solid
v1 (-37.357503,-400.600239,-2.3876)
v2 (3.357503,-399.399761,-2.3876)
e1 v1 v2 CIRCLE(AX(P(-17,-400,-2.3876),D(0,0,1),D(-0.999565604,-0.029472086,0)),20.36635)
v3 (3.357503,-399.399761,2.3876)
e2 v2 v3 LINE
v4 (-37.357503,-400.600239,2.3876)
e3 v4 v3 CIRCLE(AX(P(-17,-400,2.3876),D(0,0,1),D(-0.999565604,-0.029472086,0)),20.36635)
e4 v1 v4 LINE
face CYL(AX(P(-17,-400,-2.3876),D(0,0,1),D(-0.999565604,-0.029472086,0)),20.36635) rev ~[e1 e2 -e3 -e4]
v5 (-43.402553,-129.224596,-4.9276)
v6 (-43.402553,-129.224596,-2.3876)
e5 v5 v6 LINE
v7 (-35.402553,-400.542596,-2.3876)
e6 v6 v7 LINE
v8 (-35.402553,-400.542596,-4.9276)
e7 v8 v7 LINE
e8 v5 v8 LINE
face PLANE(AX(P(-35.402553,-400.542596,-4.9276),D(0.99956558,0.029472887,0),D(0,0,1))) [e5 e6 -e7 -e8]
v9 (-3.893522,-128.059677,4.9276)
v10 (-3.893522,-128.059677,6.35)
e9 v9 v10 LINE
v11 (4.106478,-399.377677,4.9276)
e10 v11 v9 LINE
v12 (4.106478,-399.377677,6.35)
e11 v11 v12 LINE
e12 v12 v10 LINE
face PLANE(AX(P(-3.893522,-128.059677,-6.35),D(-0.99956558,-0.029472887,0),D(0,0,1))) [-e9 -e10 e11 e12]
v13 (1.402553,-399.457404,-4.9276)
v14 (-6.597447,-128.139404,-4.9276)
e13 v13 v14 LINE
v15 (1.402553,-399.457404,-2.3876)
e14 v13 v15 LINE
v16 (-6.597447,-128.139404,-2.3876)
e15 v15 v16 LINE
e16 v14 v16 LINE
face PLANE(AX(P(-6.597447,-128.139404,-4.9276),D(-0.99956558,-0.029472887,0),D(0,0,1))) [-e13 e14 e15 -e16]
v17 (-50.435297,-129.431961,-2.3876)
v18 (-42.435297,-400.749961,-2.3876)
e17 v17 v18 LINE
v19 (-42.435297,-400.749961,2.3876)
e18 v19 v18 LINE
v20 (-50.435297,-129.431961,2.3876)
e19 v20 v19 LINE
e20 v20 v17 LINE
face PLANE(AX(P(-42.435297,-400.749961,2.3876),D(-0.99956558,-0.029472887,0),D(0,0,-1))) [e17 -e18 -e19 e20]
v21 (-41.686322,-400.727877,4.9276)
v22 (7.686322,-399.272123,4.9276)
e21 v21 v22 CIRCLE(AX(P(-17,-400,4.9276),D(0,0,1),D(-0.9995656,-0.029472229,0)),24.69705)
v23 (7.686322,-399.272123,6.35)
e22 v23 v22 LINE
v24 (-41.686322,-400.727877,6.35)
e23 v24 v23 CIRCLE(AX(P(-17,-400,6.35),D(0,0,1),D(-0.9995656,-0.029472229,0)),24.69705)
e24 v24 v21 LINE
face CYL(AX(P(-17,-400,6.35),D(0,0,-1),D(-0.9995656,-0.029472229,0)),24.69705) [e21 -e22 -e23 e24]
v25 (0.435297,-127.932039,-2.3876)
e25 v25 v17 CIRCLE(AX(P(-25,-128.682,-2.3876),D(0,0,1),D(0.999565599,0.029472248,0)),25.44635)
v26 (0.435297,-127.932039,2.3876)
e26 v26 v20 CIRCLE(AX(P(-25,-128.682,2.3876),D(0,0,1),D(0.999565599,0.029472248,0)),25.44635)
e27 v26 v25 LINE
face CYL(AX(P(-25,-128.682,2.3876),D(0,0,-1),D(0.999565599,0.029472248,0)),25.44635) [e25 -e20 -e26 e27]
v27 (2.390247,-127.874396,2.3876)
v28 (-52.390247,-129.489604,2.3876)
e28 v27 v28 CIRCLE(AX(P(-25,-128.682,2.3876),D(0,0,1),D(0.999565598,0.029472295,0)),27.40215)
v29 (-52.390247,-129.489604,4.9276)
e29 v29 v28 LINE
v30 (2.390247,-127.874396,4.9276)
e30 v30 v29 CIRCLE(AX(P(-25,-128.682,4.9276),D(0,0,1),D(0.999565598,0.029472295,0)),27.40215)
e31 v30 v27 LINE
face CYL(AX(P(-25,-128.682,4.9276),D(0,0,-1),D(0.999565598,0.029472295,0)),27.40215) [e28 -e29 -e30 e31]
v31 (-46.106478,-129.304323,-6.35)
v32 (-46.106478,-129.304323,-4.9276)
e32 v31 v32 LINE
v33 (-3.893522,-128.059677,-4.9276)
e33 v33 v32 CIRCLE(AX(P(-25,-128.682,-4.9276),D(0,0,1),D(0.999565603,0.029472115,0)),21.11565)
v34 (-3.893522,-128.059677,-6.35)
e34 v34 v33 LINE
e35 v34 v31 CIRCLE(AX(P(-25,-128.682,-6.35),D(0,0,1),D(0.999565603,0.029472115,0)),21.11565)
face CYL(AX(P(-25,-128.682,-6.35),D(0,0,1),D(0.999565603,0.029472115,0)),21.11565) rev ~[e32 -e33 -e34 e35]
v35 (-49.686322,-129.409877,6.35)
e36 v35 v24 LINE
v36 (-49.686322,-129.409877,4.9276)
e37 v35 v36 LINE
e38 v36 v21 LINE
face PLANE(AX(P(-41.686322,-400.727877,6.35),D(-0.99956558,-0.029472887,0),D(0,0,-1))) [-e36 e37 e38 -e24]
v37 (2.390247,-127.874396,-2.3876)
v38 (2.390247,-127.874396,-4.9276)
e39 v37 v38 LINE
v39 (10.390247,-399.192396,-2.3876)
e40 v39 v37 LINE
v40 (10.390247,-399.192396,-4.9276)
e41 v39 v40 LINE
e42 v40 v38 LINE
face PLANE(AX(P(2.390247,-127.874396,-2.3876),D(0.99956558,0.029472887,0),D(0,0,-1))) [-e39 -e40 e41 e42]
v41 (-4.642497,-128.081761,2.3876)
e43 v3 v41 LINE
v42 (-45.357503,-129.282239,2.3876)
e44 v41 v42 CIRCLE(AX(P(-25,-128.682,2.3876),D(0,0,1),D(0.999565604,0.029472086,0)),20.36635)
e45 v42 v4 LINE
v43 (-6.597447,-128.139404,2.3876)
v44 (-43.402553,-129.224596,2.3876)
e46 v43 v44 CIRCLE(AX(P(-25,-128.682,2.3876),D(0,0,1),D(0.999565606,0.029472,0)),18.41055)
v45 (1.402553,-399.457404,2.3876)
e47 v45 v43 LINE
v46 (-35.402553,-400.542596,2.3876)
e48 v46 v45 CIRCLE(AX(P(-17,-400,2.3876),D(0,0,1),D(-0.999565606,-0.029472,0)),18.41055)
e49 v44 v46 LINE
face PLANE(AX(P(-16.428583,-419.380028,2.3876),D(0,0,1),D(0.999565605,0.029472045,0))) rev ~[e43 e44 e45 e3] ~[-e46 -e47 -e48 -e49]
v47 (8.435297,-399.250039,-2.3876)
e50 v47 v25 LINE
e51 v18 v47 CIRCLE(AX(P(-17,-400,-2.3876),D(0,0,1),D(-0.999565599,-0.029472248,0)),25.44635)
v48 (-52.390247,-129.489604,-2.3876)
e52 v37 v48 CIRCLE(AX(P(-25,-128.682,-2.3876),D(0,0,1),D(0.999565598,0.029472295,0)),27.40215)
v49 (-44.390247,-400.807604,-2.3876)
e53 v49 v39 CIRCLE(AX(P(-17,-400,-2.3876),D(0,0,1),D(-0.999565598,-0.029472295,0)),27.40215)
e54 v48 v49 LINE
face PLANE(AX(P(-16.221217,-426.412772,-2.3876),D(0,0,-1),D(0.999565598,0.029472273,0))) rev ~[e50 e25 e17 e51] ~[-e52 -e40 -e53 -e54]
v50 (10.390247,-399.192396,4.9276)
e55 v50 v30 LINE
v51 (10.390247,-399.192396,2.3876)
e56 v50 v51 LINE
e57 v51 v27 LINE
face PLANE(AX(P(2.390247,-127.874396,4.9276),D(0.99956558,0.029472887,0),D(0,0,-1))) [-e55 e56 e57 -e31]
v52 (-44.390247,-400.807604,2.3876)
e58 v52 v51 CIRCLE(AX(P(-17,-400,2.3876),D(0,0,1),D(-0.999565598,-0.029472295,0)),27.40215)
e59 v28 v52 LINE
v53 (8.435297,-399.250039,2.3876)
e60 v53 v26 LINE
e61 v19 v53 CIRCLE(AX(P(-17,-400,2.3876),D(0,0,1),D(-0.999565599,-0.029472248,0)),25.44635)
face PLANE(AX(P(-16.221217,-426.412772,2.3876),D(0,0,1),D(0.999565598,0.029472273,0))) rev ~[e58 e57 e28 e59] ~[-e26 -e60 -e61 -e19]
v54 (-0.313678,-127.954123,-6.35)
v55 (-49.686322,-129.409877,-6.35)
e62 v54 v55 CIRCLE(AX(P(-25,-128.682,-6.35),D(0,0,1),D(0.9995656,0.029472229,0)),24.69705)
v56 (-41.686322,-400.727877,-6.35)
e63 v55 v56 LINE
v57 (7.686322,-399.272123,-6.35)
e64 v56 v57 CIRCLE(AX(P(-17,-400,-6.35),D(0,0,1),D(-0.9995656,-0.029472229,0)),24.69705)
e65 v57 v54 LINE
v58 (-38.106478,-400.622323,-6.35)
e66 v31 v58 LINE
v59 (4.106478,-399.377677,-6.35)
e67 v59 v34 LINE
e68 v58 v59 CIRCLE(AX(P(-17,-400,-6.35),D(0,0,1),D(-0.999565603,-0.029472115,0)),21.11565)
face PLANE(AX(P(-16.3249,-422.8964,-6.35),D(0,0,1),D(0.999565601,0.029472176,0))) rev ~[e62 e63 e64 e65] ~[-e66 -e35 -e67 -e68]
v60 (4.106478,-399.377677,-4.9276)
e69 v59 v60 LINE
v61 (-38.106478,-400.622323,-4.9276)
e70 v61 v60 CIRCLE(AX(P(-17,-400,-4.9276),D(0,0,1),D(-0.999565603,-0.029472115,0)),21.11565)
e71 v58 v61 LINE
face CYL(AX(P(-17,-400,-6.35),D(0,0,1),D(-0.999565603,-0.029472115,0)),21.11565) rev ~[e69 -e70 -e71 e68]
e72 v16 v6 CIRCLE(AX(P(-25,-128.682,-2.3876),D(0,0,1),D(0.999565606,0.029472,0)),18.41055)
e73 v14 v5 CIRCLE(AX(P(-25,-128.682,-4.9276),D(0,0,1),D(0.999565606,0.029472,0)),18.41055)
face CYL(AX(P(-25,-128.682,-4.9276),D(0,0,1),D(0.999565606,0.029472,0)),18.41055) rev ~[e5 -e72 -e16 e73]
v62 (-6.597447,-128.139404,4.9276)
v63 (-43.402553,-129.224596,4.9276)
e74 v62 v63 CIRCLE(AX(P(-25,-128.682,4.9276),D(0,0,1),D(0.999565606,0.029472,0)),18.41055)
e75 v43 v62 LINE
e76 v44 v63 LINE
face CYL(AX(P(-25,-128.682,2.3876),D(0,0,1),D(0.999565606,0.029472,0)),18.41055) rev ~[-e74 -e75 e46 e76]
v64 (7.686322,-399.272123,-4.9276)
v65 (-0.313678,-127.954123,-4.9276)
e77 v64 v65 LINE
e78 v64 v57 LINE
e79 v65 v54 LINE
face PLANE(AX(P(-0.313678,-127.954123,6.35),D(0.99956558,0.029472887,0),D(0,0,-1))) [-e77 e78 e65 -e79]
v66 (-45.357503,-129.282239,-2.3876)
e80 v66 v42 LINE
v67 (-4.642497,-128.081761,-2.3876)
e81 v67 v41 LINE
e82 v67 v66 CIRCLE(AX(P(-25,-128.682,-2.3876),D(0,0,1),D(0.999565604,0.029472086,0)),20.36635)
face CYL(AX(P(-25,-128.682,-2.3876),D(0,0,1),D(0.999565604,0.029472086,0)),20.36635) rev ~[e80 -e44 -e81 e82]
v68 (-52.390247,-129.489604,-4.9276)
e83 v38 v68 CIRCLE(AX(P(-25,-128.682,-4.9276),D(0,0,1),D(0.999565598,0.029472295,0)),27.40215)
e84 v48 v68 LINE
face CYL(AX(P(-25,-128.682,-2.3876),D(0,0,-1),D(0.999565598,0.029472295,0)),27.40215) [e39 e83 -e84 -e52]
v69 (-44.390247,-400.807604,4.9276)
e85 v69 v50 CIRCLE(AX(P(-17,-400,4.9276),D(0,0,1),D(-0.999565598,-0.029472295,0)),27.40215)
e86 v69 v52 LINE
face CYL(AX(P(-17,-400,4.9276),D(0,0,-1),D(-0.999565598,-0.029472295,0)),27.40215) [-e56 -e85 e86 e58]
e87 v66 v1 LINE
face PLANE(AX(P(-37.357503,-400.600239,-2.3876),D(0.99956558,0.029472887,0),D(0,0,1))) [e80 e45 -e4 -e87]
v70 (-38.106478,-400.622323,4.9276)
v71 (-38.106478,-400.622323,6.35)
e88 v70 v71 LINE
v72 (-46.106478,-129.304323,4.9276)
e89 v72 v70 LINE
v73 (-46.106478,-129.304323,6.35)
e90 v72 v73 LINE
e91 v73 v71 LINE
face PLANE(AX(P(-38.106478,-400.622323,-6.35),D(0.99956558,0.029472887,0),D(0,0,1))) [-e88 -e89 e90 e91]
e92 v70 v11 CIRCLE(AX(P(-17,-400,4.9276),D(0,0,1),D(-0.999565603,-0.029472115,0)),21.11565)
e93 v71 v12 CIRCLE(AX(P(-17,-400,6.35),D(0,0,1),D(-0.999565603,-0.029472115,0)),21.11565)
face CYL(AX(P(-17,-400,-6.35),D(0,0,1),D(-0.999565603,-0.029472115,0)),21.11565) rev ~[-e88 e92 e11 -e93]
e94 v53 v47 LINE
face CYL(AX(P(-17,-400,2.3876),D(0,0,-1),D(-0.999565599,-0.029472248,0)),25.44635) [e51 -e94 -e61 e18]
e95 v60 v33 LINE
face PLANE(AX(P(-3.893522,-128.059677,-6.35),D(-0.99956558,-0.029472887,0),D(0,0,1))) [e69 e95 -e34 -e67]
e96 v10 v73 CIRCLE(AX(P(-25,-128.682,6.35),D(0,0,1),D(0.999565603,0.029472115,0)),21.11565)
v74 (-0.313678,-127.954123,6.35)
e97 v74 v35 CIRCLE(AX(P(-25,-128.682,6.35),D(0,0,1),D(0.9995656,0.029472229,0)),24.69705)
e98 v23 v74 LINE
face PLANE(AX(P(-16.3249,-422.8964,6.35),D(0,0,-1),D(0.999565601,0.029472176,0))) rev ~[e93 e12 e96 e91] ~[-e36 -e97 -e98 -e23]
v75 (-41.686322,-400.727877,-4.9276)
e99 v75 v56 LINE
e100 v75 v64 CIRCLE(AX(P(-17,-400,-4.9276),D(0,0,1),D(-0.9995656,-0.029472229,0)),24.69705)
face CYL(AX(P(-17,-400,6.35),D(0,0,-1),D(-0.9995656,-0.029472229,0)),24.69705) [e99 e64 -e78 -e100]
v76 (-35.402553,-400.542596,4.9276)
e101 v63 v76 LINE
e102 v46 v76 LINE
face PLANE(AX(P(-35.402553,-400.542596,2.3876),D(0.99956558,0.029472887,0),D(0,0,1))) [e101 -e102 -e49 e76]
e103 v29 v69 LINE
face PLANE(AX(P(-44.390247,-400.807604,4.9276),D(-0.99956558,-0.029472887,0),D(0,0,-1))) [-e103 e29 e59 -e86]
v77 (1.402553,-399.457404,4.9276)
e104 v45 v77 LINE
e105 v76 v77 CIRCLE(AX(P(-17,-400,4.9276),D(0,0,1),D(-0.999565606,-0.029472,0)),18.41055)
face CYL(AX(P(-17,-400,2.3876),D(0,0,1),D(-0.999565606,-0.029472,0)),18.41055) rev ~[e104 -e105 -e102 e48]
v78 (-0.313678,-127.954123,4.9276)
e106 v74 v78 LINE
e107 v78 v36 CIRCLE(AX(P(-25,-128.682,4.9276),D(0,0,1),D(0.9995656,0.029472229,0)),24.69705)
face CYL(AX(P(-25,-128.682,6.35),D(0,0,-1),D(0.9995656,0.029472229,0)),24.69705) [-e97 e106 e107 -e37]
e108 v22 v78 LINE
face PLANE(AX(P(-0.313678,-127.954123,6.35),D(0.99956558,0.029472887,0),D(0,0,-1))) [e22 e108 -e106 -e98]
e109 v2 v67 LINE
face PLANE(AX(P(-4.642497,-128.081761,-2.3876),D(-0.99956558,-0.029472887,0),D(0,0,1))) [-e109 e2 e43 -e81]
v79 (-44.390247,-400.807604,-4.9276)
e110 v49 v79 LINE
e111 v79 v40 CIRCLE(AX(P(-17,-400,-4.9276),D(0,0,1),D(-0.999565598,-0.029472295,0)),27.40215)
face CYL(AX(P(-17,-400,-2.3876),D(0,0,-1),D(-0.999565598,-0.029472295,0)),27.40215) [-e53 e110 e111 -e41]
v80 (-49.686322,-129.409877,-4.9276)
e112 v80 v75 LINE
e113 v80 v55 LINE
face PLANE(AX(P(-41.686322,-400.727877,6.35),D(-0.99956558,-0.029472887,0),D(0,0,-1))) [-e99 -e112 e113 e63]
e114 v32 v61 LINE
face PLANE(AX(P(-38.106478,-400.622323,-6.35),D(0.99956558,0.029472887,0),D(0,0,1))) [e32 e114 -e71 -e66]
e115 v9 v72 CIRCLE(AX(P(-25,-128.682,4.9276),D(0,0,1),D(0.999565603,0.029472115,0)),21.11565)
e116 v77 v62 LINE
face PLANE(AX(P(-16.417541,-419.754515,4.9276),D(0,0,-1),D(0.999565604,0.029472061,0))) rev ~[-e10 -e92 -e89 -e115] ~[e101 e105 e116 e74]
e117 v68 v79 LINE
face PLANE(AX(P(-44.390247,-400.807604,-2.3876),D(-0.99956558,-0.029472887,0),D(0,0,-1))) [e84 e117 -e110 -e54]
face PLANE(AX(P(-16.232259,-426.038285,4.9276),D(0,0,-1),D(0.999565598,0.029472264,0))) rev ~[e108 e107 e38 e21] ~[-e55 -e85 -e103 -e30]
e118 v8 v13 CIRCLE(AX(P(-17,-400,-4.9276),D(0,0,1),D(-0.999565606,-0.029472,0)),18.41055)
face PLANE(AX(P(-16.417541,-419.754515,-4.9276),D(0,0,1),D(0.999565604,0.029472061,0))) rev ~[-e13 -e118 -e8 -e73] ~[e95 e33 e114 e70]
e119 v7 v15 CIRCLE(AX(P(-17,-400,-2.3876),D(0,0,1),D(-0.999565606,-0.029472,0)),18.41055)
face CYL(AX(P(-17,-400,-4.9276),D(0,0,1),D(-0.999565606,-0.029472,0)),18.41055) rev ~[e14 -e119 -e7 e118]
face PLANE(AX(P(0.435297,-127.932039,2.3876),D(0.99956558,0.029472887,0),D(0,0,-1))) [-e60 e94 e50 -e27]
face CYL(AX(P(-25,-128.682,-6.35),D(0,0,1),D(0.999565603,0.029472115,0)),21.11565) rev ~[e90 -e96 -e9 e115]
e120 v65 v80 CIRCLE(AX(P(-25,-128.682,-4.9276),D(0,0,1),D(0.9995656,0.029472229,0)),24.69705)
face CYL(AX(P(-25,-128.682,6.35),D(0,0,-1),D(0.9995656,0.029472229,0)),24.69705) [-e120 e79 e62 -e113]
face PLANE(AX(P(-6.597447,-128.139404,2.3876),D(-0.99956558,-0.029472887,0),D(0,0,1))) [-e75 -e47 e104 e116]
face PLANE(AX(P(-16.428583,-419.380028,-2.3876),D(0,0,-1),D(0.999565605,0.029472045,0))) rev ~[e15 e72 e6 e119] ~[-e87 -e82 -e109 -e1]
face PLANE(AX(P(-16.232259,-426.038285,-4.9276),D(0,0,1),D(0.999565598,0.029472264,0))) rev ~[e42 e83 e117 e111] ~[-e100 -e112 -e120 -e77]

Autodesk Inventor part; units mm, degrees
ref_plane "Work Plane2" through (-17, -400, 0) normal (-1, 0, 0) x (0, 0, 1)
ref_plane "Work Plane3" through (-25, -128.682, 0) normal (-0.1045285, -0.9945219, 0) x (0, 0, 1)
sketch "Path" plane through (0, 0, 0) normal (0, 0, 1) x (1, 0, 0)
  arc A0 (-39.8964, -400.6751) -> (5.8964, -399.3249) centre (-17, -400) ccw
  arc A1 (-2.1036, -128.0069) -> (-47.8964, -129.3571) centre (-25, -128.682) ccw
  line L0 (-2.1036, -128.0069) -> (5.8964, -399.3249)
  line L1 (-39.8964, -400.6751) -> (-47.8964, -129.3571)
  dimension "d31" = 8.9916
ref_plane "Section Plane" through (5.8964, -399.3249, 0) normal (-0.0294729, 0.9995656, 0) x (0, 0, 1)
sketch "Section Sketch" plane through (5.8964, -399.3249, 0) normal (-0.0294729, 0.9995656, 0) x (0, 0, 1)
  line L0 (-6.35, -1.7907) -> (6.35, -1.7907)
  line L1 (6.35, -1.7907) -> (6.35, 1.7907)
  line L2 (6.35, 1.7907) -> (-6.35, 1.7907)
  line L3 (-6.35, 1.7907) -> (-6.35, -1.7907)
  line L4 (-2.3876, -2.54) -> (2.3876, -2.54)
  line L5 (2.3876, -2.54) -> (2.3876, 2.54)
  line L6 (2.3876, 2.54) -> (-2.3876, 2.54)
  line L7 (-2.3876, 2.54) -> (-2.3876, -2.54)
  line L8 (-2.3876, 0) -> (2.3876, 0) construction
  line L9 (-4.9276, -4.4958) -> (-2.3876, -4.4958)
  line L10 (-2.3876, -4.4958) -> (-2.3876, 4.4958)
  line L11 (-2.3876, 4.4958) -> (-4.9276, 4.4958)
  line L12 (-4.9276, 4.4958) -> (-4.9276, -4.4958)
  line L13 (2.3876, -4.4958) -> (4.9276, -4.4958)
  line L14 (4.9276, -4.4958) -> (4.9276, 4.4958)
  line L15 (4.9276, 4.4958) -> (2.3876, 4.4958)
  line L16 (2.3876, 4.4958) -> (2.3876, -4.4958)
  line L17 (-6.35, 0) -> (6.35, 0) construction
  point P0 (0, 0)
  point P1 (0, 0)
  dimension "d21" = 3.5814
  dimension "d22" = 5.08
  dimension "d23" = 4.7752
  dimension "d24" = 2.54
  dimension "d31" = 8.9916
  dimension "d32" = 12.7
sweep "Solid" add profiles "Section Sketch" path "Path"
pattern_of_one "Strand Pattern"
equation "\"d21\" = da_d2"
equation "\"d22\" = da_d1"
equation "\"d23\" = da_b1"
equation "\"d24\" = da_t1 + da_t2"
equation "\"d30\" = da_pt"
equation "\"da_p\" = 9.525"
equation "\"da_b1\" = 4.7752"
equation "\"da_h2\" = 8.9916"
equation "\"da_h3\" = 7.7978"
equation "\"da_d1\" = 5.08"
equation "\"da_d2\" = 3.5814"
equation "\"da_pt\" = 10.1346"
equation "\"da_b\" = 12.7"
equation "\"da_t1\" = 1.27"
equation "\"da_t2\" = 1.27"
properties part number "Roller Chain"
